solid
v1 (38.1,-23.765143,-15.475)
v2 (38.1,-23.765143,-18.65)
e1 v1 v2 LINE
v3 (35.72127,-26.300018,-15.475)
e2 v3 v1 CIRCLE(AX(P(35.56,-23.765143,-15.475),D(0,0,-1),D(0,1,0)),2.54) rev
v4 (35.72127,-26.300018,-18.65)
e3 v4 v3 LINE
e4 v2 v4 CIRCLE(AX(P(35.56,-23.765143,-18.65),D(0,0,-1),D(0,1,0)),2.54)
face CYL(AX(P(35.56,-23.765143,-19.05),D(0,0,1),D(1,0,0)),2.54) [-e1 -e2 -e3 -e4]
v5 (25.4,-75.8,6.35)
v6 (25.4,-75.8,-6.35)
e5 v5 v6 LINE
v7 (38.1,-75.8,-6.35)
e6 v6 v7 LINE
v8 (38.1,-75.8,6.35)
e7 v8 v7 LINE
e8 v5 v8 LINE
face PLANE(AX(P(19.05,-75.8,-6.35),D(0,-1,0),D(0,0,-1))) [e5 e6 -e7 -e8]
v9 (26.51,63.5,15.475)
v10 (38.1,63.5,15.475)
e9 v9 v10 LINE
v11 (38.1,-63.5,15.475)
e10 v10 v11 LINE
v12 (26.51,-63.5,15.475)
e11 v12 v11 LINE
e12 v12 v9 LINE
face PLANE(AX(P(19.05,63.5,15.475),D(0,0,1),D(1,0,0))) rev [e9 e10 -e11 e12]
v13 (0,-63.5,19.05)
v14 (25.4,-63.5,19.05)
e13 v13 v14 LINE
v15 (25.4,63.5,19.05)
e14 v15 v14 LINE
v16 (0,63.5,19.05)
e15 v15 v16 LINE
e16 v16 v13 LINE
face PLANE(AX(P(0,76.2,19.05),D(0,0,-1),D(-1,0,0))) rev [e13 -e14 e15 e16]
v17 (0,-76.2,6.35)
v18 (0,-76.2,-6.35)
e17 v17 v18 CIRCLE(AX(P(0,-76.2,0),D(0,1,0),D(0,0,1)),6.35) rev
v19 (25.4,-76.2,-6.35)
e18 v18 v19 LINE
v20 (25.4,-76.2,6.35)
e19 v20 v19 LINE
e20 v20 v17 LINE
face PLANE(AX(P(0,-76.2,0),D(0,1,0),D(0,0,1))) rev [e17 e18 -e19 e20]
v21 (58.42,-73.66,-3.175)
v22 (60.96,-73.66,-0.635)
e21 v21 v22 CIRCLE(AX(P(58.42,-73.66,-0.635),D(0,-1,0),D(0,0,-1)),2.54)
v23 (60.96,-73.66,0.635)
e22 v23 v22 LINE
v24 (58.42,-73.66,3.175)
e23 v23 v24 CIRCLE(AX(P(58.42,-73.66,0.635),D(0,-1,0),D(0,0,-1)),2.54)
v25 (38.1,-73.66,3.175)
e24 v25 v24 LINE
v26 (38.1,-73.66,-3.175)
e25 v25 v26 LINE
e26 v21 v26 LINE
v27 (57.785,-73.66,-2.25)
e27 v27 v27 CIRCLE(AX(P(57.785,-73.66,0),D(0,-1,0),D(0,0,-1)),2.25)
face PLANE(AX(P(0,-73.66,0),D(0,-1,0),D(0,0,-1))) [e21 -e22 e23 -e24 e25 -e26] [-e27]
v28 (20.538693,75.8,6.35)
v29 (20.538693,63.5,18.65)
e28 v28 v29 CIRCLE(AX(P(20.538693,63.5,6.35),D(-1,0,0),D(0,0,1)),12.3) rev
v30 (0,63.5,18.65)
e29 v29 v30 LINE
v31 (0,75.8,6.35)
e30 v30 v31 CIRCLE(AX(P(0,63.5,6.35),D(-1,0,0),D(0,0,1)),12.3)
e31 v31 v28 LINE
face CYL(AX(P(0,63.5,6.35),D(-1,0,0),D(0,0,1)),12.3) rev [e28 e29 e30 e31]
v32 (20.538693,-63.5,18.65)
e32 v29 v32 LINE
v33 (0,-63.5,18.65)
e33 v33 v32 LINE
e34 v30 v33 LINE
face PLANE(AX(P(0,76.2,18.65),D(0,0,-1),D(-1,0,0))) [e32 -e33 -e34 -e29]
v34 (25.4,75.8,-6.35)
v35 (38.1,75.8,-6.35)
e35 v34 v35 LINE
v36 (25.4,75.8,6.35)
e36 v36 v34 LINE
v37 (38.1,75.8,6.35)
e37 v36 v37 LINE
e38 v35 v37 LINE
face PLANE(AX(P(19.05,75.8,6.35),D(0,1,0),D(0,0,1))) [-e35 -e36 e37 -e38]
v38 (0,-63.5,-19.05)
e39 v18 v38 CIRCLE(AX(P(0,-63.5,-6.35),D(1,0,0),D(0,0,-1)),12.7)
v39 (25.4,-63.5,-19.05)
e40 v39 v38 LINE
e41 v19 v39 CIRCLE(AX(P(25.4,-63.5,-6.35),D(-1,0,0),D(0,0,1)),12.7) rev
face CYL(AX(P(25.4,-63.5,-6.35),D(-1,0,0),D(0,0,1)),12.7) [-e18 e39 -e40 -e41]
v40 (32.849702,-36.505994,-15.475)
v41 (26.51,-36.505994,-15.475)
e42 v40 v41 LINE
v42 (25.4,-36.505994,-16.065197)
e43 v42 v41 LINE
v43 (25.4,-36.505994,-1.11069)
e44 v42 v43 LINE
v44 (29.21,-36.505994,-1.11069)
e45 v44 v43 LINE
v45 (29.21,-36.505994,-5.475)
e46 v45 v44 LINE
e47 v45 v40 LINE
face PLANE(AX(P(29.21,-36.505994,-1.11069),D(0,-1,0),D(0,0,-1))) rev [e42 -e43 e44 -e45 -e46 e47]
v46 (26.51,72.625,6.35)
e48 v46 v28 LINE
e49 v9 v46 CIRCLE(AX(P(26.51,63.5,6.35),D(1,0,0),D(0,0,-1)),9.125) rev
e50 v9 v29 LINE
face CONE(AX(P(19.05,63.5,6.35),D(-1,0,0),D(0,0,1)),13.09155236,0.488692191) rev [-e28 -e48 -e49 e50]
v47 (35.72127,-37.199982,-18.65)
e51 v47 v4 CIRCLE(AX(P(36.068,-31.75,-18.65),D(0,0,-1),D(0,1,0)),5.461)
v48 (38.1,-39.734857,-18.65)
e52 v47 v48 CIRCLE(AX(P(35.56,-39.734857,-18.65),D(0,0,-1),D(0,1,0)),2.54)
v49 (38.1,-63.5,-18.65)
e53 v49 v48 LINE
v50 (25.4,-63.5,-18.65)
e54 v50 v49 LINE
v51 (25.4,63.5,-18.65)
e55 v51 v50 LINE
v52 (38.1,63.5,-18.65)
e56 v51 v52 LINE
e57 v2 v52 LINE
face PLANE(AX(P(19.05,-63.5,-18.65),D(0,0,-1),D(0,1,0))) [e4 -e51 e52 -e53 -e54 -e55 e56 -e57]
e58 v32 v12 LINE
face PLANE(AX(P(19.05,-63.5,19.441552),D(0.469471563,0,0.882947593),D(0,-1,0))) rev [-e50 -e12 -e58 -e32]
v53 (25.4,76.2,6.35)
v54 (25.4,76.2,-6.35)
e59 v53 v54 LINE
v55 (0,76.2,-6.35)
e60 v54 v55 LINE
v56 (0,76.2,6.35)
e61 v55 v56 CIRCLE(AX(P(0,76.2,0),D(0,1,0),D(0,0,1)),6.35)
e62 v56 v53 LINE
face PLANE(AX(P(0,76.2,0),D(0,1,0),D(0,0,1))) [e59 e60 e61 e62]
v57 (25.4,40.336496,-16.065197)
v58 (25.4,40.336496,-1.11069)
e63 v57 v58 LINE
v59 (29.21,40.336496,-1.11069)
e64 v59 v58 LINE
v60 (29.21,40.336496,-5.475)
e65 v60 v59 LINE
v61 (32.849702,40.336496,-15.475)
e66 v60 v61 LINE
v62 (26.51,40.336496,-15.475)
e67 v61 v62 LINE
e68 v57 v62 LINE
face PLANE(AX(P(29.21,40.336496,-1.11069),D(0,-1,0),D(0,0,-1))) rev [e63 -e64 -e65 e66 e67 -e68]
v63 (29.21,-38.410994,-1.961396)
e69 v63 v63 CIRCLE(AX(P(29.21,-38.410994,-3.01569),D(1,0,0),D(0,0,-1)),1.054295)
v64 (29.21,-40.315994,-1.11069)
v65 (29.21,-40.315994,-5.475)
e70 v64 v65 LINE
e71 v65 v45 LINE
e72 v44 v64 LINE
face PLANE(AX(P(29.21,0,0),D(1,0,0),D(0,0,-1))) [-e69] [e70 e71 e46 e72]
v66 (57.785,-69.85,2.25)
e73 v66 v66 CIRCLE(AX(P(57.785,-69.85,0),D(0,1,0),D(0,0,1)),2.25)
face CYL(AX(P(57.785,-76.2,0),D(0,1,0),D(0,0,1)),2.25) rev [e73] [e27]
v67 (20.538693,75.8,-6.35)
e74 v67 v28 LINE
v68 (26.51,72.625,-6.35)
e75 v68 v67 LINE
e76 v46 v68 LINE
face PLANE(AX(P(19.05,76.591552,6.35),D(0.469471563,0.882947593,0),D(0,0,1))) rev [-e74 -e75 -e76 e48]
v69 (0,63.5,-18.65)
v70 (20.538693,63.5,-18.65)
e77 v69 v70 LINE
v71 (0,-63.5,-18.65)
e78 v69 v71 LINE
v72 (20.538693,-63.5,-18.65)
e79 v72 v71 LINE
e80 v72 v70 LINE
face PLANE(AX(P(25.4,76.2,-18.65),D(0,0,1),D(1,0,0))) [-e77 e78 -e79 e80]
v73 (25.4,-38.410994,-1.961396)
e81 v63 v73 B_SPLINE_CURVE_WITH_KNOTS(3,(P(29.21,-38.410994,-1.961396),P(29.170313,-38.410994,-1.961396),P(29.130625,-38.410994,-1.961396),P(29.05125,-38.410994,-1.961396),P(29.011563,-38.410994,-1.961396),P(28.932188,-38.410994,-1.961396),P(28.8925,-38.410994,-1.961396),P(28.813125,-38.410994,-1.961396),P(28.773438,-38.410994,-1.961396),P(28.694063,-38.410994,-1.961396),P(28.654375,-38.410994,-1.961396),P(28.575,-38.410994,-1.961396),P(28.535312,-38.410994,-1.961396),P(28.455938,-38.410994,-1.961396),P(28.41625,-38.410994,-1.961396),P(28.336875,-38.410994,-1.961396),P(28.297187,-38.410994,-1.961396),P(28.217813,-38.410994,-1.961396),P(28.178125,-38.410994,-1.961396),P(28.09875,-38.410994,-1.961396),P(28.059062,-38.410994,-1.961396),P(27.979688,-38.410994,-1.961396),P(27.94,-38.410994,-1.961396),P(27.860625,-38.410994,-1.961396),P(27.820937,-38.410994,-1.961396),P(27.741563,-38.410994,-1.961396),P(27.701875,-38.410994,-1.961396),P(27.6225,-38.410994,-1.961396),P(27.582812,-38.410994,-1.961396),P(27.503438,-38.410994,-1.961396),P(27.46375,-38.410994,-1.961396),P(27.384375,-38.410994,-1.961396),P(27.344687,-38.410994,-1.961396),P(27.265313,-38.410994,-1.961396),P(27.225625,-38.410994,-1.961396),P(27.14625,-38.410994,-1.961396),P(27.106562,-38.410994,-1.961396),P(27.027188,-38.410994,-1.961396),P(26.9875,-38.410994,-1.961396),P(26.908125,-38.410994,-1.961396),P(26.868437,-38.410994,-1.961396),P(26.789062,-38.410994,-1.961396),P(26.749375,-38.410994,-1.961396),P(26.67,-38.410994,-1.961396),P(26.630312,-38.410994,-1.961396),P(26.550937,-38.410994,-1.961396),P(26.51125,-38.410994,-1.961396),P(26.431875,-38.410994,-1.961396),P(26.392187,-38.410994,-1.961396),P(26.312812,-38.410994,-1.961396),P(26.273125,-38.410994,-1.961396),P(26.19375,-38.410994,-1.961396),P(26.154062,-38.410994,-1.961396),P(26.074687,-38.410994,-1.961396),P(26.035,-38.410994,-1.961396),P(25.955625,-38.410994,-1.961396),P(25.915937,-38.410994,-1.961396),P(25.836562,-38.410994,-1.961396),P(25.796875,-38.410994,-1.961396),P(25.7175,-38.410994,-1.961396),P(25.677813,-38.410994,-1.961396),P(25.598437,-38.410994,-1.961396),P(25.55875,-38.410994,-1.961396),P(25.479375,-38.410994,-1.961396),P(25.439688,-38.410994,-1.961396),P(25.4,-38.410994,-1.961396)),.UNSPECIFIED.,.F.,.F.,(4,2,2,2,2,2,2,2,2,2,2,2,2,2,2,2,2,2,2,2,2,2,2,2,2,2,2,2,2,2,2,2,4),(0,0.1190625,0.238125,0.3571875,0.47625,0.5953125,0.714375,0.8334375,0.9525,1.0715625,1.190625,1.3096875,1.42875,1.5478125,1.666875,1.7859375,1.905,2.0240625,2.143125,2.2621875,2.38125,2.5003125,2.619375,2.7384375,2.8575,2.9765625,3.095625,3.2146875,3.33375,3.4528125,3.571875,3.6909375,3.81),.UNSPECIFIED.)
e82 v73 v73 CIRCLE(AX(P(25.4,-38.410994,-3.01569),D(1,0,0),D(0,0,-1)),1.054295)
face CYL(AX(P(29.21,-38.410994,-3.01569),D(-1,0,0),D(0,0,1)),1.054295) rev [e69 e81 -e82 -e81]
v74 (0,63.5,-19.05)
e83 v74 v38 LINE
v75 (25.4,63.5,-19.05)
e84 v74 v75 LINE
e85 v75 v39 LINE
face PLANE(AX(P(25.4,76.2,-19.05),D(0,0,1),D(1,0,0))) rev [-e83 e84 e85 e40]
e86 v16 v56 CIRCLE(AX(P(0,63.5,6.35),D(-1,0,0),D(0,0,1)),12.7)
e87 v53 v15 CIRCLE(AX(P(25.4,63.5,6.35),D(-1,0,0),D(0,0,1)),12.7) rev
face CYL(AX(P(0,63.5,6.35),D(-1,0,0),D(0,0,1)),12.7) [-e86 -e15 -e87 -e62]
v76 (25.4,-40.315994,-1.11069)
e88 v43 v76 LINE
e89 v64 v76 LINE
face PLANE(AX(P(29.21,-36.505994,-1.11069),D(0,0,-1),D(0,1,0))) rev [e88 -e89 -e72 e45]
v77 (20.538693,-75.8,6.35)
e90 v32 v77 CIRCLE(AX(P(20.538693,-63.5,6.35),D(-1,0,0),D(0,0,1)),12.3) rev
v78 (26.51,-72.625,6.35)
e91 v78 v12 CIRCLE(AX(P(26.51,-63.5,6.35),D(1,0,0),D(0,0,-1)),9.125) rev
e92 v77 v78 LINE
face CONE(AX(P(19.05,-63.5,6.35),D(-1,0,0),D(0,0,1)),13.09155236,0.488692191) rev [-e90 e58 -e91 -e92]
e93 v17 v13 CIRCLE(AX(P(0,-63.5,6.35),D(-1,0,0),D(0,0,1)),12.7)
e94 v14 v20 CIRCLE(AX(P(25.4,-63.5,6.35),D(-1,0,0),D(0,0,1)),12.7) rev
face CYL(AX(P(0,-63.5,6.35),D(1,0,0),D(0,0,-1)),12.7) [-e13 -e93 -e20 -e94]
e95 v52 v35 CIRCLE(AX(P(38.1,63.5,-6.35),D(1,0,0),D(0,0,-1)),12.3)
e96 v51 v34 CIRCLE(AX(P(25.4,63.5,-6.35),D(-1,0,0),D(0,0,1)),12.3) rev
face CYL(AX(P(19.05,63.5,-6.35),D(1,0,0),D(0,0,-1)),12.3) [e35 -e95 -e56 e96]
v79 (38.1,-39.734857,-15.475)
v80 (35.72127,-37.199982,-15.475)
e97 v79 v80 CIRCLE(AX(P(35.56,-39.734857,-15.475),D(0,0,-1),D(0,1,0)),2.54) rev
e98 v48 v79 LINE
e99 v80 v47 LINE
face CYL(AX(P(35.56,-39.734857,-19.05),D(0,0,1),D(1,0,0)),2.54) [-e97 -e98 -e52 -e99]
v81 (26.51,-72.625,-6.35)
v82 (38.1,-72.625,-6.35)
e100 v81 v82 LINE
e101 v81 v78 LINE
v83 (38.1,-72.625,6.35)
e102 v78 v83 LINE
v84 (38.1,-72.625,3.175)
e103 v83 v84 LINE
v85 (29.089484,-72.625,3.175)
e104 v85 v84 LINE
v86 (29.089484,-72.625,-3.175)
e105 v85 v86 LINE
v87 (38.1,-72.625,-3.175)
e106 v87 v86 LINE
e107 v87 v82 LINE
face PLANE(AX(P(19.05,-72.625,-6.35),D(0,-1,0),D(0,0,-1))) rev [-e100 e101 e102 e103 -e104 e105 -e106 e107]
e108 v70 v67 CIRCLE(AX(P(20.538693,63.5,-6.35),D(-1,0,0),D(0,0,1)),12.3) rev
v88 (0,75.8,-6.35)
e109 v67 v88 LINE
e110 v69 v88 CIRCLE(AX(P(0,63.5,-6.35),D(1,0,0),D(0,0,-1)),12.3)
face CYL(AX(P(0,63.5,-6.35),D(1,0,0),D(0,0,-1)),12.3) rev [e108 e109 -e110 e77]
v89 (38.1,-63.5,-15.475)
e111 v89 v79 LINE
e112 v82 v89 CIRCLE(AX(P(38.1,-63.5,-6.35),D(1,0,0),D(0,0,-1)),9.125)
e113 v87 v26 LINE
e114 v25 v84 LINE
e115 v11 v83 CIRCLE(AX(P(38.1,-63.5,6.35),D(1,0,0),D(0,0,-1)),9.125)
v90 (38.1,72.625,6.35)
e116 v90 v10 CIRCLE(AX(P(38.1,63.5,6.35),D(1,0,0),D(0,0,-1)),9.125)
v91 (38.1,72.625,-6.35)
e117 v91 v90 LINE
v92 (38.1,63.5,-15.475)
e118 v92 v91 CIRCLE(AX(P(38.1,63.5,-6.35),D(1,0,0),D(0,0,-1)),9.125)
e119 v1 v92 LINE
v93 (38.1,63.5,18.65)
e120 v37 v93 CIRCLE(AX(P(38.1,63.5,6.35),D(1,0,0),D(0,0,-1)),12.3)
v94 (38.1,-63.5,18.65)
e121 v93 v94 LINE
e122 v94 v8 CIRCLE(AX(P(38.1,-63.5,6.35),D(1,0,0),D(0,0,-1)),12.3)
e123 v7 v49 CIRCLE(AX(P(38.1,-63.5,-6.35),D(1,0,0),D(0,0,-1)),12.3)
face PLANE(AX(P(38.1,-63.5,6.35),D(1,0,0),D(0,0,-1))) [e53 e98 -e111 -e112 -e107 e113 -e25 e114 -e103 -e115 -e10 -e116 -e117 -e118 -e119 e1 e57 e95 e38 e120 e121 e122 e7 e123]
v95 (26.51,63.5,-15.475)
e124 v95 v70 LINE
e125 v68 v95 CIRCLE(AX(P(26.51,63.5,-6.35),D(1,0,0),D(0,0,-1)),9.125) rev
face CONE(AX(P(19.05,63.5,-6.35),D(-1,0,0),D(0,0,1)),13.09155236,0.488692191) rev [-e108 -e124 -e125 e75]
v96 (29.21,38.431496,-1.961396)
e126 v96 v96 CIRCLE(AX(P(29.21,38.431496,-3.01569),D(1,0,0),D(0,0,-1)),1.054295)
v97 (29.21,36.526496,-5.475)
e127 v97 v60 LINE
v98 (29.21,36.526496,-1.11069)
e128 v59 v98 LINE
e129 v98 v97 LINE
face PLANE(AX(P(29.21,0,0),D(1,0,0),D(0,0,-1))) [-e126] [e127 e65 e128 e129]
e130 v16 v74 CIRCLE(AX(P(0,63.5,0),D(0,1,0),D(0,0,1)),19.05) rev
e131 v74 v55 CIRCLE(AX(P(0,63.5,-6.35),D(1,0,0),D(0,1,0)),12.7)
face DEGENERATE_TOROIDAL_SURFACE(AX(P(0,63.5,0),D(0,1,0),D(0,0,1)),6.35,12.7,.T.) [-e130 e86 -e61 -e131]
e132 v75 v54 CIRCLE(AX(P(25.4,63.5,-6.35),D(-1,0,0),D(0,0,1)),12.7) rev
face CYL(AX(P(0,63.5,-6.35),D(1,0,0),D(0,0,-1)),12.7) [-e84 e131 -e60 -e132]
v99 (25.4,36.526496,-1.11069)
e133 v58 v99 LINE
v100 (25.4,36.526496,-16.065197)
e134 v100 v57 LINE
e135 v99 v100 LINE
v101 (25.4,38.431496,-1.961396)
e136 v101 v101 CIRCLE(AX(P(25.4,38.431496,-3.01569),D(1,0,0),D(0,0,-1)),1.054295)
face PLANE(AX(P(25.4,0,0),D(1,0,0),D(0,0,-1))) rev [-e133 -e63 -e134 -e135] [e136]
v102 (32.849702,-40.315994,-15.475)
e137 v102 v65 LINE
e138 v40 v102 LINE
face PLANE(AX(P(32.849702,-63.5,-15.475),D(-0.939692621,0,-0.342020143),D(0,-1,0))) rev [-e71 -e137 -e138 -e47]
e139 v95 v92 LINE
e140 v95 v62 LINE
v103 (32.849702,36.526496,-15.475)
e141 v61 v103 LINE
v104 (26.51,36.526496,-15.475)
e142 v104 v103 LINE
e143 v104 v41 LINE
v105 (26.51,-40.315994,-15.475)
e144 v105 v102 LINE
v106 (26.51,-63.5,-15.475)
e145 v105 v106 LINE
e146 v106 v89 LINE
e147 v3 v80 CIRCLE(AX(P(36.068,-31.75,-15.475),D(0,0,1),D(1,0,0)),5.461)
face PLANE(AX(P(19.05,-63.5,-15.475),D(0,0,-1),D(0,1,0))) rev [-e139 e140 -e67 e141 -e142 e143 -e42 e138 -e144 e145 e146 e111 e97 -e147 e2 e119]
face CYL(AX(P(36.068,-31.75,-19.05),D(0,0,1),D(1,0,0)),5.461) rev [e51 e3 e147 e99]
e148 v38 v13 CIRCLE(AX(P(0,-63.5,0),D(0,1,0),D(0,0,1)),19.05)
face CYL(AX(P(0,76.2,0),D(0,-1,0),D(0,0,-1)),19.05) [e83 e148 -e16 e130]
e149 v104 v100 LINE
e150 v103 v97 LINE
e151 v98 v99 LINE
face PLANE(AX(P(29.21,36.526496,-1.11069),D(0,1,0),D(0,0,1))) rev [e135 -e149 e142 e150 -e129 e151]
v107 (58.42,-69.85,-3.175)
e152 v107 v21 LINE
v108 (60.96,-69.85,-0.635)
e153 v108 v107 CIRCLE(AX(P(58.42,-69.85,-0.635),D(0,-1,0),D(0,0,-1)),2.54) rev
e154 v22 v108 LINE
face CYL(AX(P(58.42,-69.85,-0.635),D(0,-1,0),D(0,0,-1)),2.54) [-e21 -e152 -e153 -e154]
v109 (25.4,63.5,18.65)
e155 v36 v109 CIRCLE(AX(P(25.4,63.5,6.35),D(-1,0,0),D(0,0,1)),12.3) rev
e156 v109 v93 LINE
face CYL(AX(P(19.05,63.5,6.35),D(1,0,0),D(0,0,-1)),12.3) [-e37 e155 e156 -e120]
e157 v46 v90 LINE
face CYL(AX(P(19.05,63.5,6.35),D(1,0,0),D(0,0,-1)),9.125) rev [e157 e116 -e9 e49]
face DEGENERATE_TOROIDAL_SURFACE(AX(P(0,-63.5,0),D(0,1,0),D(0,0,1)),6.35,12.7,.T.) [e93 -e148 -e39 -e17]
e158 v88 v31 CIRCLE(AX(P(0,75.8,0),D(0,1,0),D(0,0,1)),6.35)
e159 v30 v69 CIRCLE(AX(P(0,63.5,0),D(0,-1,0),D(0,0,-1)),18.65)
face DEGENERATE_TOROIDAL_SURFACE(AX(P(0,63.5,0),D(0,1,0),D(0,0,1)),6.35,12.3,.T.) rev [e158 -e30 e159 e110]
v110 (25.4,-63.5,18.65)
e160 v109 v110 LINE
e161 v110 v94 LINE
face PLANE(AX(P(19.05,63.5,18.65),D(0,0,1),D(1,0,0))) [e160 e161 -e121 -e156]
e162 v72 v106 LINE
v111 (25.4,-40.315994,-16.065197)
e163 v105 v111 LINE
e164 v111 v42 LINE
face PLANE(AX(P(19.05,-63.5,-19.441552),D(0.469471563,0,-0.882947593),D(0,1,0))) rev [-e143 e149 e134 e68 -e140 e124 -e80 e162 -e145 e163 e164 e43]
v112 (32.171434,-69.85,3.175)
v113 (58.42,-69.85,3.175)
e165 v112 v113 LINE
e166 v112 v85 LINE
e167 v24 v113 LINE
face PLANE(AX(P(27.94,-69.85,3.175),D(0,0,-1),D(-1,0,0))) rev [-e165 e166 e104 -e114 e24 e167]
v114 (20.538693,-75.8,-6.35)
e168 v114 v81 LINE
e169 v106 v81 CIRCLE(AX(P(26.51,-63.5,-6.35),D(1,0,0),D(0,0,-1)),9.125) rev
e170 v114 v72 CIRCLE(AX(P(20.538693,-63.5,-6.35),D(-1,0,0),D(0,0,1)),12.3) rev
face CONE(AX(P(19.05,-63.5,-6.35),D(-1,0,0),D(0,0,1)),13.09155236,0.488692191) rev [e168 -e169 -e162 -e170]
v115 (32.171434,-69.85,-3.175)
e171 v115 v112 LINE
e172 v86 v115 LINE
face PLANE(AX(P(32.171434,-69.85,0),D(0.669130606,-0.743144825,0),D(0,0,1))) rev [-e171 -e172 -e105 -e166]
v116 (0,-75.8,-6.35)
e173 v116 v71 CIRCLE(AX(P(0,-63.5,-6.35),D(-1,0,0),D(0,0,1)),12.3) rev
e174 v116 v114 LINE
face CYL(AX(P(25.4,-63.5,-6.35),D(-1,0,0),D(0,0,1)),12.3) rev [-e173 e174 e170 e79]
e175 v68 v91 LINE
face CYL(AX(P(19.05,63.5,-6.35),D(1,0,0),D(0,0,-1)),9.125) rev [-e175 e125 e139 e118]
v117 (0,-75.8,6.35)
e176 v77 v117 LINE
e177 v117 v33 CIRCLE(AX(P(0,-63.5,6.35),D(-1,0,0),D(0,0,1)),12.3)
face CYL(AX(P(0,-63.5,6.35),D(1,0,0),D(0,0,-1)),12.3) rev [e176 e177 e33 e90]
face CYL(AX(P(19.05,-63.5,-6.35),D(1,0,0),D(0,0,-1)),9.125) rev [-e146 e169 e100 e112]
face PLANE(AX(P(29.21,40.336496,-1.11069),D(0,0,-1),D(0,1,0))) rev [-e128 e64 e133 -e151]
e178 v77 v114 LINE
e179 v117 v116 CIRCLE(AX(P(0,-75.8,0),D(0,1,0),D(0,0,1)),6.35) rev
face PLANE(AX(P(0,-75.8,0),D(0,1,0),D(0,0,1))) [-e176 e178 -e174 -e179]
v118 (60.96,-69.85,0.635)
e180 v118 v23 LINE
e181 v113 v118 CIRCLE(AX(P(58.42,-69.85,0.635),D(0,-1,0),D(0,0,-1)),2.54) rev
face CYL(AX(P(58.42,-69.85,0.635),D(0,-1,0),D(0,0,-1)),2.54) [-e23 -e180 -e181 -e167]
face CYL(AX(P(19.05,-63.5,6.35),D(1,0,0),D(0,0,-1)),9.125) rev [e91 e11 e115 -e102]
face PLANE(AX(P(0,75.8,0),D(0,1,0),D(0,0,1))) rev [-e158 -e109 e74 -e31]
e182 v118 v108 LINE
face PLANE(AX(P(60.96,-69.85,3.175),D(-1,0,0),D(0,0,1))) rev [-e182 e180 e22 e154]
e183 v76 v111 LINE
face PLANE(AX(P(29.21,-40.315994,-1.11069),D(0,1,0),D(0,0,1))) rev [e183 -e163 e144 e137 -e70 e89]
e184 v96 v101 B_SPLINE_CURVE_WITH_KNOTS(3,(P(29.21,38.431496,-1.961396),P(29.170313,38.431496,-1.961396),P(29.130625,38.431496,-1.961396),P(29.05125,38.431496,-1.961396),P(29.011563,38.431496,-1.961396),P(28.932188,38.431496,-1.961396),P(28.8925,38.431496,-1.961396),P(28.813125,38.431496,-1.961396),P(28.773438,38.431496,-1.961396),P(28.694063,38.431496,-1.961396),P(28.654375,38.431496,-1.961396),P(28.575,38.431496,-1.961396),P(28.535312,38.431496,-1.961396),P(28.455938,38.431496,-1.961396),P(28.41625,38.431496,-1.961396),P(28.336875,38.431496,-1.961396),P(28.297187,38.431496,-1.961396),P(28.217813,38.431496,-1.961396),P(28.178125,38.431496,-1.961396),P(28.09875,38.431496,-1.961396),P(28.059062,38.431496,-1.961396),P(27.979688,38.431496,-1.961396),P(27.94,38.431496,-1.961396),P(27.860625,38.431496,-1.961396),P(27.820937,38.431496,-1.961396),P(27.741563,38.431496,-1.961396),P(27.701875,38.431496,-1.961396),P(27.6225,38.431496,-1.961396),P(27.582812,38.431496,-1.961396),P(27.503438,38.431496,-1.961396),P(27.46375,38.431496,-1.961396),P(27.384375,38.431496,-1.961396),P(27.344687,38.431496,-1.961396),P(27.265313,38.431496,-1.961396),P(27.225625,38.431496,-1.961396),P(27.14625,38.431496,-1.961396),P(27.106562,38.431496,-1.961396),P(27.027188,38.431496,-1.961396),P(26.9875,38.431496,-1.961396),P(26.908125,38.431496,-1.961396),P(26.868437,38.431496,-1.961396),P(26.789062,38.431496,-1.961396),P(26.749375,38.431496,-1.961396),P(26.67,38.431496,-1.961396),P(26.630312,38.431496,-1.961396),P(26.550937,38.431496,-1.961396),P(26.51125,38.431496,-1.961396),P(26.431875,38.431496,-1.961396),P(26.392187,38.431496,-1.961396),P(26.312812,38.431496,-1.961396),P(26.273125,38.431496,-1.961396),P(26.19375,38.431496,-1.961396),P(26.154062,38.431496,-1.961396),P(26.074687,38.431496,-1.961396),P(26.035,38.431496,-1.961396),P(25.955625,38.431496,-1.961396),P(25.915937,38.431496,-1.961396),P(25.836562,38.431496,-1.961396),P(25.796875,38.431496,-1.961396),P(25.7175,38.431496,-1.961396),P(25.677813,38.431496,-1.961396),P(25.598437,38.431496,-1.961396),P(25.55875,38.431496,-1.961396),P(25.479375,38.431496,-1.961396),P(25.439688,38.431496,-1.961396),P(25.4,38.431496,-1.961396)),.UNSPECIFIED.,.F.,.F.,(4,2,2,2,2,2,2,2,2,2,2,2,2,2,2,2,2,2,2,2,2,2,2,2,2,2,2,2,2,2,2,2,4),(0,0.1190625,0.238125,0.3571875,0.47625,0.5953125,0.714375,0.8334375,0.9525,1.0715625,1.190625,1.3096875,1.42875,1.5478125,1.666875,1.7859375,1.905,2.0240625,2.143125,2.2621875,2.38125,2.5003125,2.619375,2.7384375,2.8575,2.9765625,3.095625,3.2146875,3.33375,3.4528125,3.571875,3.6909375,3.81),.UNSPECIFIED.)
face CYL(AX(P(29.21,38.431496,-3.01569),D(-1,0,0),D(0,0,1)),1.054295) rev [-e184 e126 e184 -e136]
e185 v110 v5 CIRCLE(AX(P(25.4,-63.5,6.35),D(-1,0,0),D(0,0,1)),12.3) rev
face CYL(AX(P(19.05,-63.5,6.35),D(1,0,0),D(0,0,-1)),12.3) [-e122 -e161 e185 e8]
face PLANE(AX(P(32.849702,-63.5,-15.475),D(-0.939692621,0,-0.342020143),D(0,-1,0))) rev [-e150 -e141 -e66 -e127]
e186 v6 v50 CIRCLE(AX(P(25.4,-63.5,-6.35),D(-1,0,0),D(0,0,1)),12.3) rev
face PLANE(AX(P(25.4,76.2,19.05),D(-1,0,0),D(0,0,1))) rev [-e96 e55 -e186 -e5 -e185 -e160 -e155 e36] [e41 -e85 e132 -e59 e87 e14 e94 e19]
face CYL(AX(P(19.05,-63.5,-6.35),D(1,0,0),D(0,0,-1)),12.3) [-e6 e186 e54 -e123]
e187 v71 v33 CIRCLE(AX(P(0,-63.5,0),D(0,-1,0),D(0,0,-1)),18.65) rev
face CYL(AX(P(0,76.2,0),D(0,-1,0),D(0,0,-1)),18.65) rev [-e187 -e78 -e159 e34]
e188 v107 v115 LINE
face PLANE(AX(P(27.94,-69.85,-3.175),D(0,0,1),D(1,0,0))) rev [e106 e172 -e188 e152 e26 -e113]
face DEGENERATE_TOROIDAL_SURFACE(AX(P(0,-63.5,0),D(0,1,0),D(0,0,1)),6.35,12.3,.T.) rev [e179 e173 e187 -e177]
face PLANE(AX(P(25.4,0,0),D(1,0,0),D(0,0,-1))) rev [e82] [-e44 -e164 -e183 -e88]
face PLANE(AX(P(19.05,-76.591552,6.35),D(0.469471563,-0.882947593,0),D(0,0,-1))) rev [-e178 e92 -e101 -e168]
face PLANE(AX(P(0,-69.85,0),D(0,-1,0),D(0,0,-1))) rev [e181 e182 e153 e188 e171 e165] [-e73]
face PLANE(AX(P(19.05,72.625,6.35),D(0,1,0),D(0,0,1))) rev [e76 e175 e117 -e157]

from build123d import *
from OCP.BRepFilletAPI import BRepFilletAPI_MakeChamfer

# Parameters (mm, degrees)
BOSS_EXTRUDE1_DEPTH      = 76.2
FILLET1_R                = 12.7
SHELL1_T                 = -0.4
EXTRUDE_THIN1_DEPTH      = 12.7
EXTRUDE_THIN1_DEPTH_BACK = 6.35
CHAMFER1_SIZE            = 7.46
CHAMFER1_SIZE_2          = 3.96655236
SKETCH6_W                = 17.539309582
SKETCH6_H                = 3.81
SKETCH6_R                = 1.054294776
BOSS_EXTRUDE3_DEPTH      = 3.81
CHAMFER2_SIZE            = 10
CHAMFER2_SIZE2           = 3.639702343
SKETCH7_W                = 33.02
SKETCH7_H                = 6.35
BOSS_EXTRUDE4_DEPTH      = 3.81
CHAMFER3_SIZE            = 3.81
CHAMFER3_SIZE_2          = 4.231433681
SKETCH8_R                = 2.25
CUT_EXTRUDE1_DEPTH       = 160.403972974
FILLET2_R                = 2.54
SKETCH9_R                = 5.461
CUT_EXTRUDE2_DEPTH       = 104.511048806
FILLET3_R                = 2.54


with BuildPart() as part:
    # Sketch1 → Boss-Extrude1 (new, symmetric)
    with BuildSketch(Plane(origin=(0, 0, 0), x_dir=(1, 0, 0), z_dir=(0, 1, 0))):
        with BuildLine():
            Line((0, -19.05), (25.4, -19.05))
            Line((25.4, -19.05), (25.4, 19.05))
            Line((25.4, 19.05), (0, 19.05))
            ThreePointArc((0, 19.05), (-19.05, 0), (0, -19.05))
        make_face()
    extrude(amount=BOSS_EXTRUDE1_DEPTH, both=True)

    # Fillet1
    fillet1_edges = [part.edges().sort_by_distance(p)[0] for p in [
        (12.7, 76.2, -19.05),
        (-19.05, 76.2, 0),
        (12.7, -76.2, -19.05),
        (12.7, -76.2, 19.05),
        (-19.05, -76.2, 0),
        (12.7, 76.2, 19.05),
    ]]
    fillet(fillet1_edges, radius=FILLET1_R)

    # Shell1
    shell1_openings = [part.faces().sort_by_distance(p)[0] for p in [
        (25.4, 0, 0),
    ]]
    offset(amount=SHELL1_T, openings=shell1_openings, kind=Kind.INTERSECTION)

    # Sketch4 → Extrude-Thin1 (add, two sides: drawn at the far end of the back side and taken through both)
    with BuildSketch(Plane(origin=(25.4, 0, 0), x_dir=(0, 0, -1), z_dir=(1, 0, 0)).offset(-EXTRUDE_THIN1_DEPTH_BACK)):
        with BuildLine():
            Line((18.65, 63.5), (18.65, -63.5))
            ThreePointArc((18.65, -63.5), (15.047413409, -72.197413409), (6.35, -75.8))
            Line((6.35, -75.8), (-6.35, -75.8))
            ThreePointArc((-6.35, -75.8), (-15.047413409, -72.197413409), (-18.65, -63.5))
            Line((-18.65, -63.5), (-18.65, 63.5))
            ThreePointArc((-18.65, 63.5), (-15.047413409, 72.197413409), (-6.35, 75.8))
            Line((-6.35, 75.8), (6.35, 75.8))
            ThreePointArc((6.35, 75.8), (15.047413409, 72.197413409), (18.65, 63.5))
        make_face()
        with BuildLine():
            Line((15.475, 63.5), (15.475, -63.5))
            ThreePointArc((15.475, -63.5), (12.802349378, -69.952349378), (6.35, -72.625))
            Line((6.35, -72.625), (-6.35, -72.625))
            ThreePointArc((-6.35, -72.625), (-12.802349378, -69.952349378), (-15.475, -63.5))
            Line((-15.475, -63.5), (-15.475, 63.5))
            ThreePointArc((-15.475, 63.5), (-12.802349378, 69.952349378), (-6.35, 72.625))
            Line((-6.35, 72.625), (6.35, 72.625))
            ThreePointArc((6.35, 72.625), (12.802349378, 69.952349378), (15.475, 63.5))
        make_face(mode=Mode.SUBTRACT)
    extrude(amount=EXTRUDE_THIN1_DEPTH + EXTRUDE_THIN1_DEPTH_BACK)

    # Chamfer1
    # the kernel refuses this chamfer: 7.46, 3.96655236 mm, written as the material it takes off along each edge
    with BuildSketch(Plane(origin=(19.05, 63.5, -15.475), x_dir=(0.9998355423896509, 0, 0.01813527431257697), z_dir=(0, -1, 0))) as chamfer1_piece_1_section:
        Polygon((CHAMFER1_SIZE * 0.99983554239, -CHAMFER1_SIZE * 0.0181352743126), (-CHAMFER1_SIZE_2 * 0.0181352743135, -CHAMFER1_SIZE_2 * 0.999835542439), (0, 0), align=None)
    chamfer1_piece_1 = extrude(amount=127, mode=Mode.PRIVATE)
    chamfer1_piece_1 = split(chamfer1_piece_1, bisect_by=Plane(origin=(21.815261342, 60.108381876, -18.65), z_dir=(0, 0, 1)), keep=Keep.TOP, mode=Mode.PRIVATE)
    add(chamfer1_piece_1, mode=Mode.SUBTRACT)
    with BuildSketch(Plane(origin=(19.05, 63.5, -6.35), x_dir=(0, 1, 0), z_dir=(0, 0, 1))) as chamfer1_piece_2_section:
        Polygon((9.125, -CHAMFER1_SIZE), (9.125 + CHAMFER1_SIZE_2, 0), (9.125, 0), align=None)
    chamfer1_piece_2 = revolve(axis=Axis((19.05, 63.5, -6.35), (-1, 0, 0)), revolution_arc=90, mode=Mode.PRIVATE)
    chamfer1_piece_2 = chamfer1_piece_2 & Plane(origin=(21.967036343, 63.5, -6.35), x_dir=(0, 0, -1), z_dir=(-1, 0, 0)) * Cylinder(12.3, 53, mode=Mode.PRIVATE)
    add(chamfer1_piece_2, mode=Mode.SUBTRACT)
    with BuildSketch(Plane(origin=(19.05, -63.5, -6.35), x_dir=(0, 0, -1), z_dir=(0, 1, 0))) as chamfer1_piece_3_section:
        Polygon((9.125, -CHAMFER1_SIZE), (9.125 + CHAMFER1_SIZE_2, 0), (9.125, 0), align=None)
    chamfer1_piece_3 = revolve(axis=Axis((19.05, -63.5, -6.35), (-1, 0, 0)), revolution_arc=90, mode=Mode.PRIVATE)
    chamfer1_piece_3 = chamfer1_piece_3 & Plane(origin=(21.967036343, -63.5, -6.35), x_dir=(0, 0, -1), z_dir=(-1, 0, 0)) * Cylinder(12.3, 53, mode=Mode.PRIVATE)
    add(chamfer1_piece_3, mode=Mode.SUBTRACT)
    with BuildSketch(Plane(origin=(19.05, 72.625, 6.35), x_dir=(0.9998355423896509, -0.01813527431257697, 0), z_dir=(0, 0, -1))) as chamfer1_piece_4_section:
        Polygon((CHAMFER1_SIZE * 0.99983554239, -CHAMFER1_SIZE * 0.0181352743126), (-CHAMFER1_SIZE_2 * 0.0181352743135, -CHAMFER1_SIZE_2 * 0.999835542439), (0, 0), align=None)
    chamfer1_piece_4 = extrude(amount=12.7, mode=Mode.PRIVATE)
    chamfer1_piece_4 = split(chamfer1_piece_4, bisect_by=Plane(origin=(21.637658595, 75.8, 3.947497634), z_dir=(0, -1, 0)), keep=Keep.TOP, mode=Mode.PRIVATE)
    add(chamfer1_piece_4, mode=Mode.SUBTRACT)
    with BuildSketch(Plane(origin=(19.05, -72.625, -6.35), x_dir=(0.9998355423896509, 0.01813527431257697, 0), z_dir=(0, 0, 1))) as chamfer1_piece_5_section:
        Polygon((CHAMFER1_SIZE * 0.99983554239, -CHAMFER1_SIZE * 0.0181352743126), (-CHAMFER1_SIZE_2 * 0.0181352743135, -CHAMFER1_SIZE_2 * 0.999835542439), (0, 0), align=None)
    chamfer1_piece_5 = extrude(amount=12.7, mode=Mode.PRIVATE)
    chamfer1_piece_5 = split(chamfer1_piece_5, bisect_by=Plane(origin=(21.637658595, -75.8, -3.947497634), z_dir=(0, 1, 0)), keep=Keep.TOP, mode=Mode.PRIVATE)
    add(chamfer1_piece_5, mode=Mode.SUBTRACT)
    with BuildSketch(Plane(origin=(19.05, 63.5, 6.35), x_dir=(0, 0, 1), z_dir=(0, -1, 0))) as chamfer1_piece_6_section:
        Polygon((9.125, -CHAMFER1_SIZE), (9.125 + CHAMFER1_SIZE_2, 0), (9.125, 0), align=None)
    chamfer1_piece_6 = revolve(axis=Axis((19.05, 63.5, 6.35), (-1, 0, 0)), revolution_arc=90, mode=Mode.PRIVATE)
    chamfer1_piece_6 = chamfer1_piece_6 & Plane(origin=(21.967036343, 63.5, 6.35), x_dir=(0, 0, 1), z_dir=(1, 0, 0)) * Cylinder(12.3, 53, mode=Mode.PRIVATE)
    add(chamfer1_piece_6, mode=Mode.SUBTRACT)
    with BuildSketch(Plane(origin=(19.05, -63.5, 6.35), x_dir=(0, -1, 0), z_dir=(0, 0, -1))) as chamfer1_piece_7_section:
        Polygon((9.125, -CHAMFER1_SIZE), (9.125 + CHAMFER1_SIZE_2, 0), (9.125, 0), align=None)
    chamfer1_piece_7 = revolve(axis=Axis((19.05, -63.5, 6.35), (-1, 0, 0)), revolution_arc=90, mode=Mode.PRIVATE)
    chamfer1_piece_7 = chamfer1_piece_7 & Plane(origin=(21.967036343, -63.5, 6.35), x_dir=(0, 0, 1), z_dir=(1, 0, 0)) * Cylinder(12.3, 53, mode=Mode.PRIVATE)
    add(chamfer1_piece_7, mode=Mode.SUBTRACT)
    with BuildSketch(Plane(origin=(19.05, -63.5, 15.475), x_dir=(0.9998355423896509, 0, -0.01813527431257697), z_dir=(0, 1, 0))) as chamfer1_piece_8_section:
        Polygon((CHAMFER1_SIZE * 0.99983554239, -CHAMFER1_SIZE * 0.0181352743126), (-CHAMFER1_SIZE_2 * 0.0181352743135, -CHAMFER1_SIZE_2 * 0.999835542439), (0, 0), align=None)
    chamfer1_piece_8 = extrude(amount=127, mode=Mode.PRIVATE)
    chamfer1_piece_8 = split(chamfer1_piece_8, bisect_by=Plane(origin=(21.815261342, -60.108381876, 18.65), z_dir=(0, 0, -1)), keep=Keep.TOP, mode=Mode.PRIVATE)
    add(chamfer1_piece_8, mode=Mode.SUBTRACT)

    # Sketch6 → Boss-Extrude3 (add)
    # profile 1 of 2: a face of its own
    with BuildSketch(Plane(origin=(25.4, 0, 0), x_dir=(0, 0, -1), z_dir=(1, 0, 0))):
        with Locations((9.880345209, 38.431496192)):
            Rectangle(SKETCH6_W, SKETCH6_H)
        with Locations(Location((3.015690418, 38.431496192, 0), (0, 0, 180))):
            Circle(SKETCH6_R, mode=Mode.SUBTRACT)
    # profile 2 of 2: a face of its own
    with BuildSketch(Plane(origin=(25.4, 0, 0), x_dir=(0, 0, -1), z_dir=(1, 0, 0))):
        with Locations((9.880345209, -38.410993514)):
            Rectangle(SKETCH6_W, SKETCH6_H)
        with Locations(Location((3.015690418, -38.410993514, 0), (0, 0, 180))):
            Circle(SKETCH6_R, mode=Mode.SUBTRACT)
    extrude(amount=BOSS_EXTRUDE3_DEPTH)

    # Chamfer2: one chamfer whose edges measure the first distance from different faces: ONE call of the kernel's chamfer builder (chamfer() names one face for all edges)
    chamfer2_edges_1 = [part.edges().sort_by_distance(p)[0] for p in [
        (29.21, -38.410993514, -15.475),
    ]]
    chamfer2_side_1 = [part.faces().sort_by_distance(p)[0] for p in [
        (29.21, -38.410993514, -8.652510406),
    ]]
    chamfer2_edges_2 = [part.edges().sort_by_distance(p)[0] for p in [
        (29.21, 38.431496192, -15.475),
    ]]
    chamfer2_side_2 = [part.faces().sort_by_distance(p)[0] for p in [
        (29.21, 38.431496192, -8.652510406),
    ]]
    chamfer2 = BRepFilletAPI_MakeChamfer(part.part.solid().wrapped)
    for e in chamfer2_edges_1:
        chamfer2.Add(CHAMFER2_SIZE, CHAMFER2_SIZE2, e.wrapped, chamfer2_side_1[0].wrapped)  # the first distance lies on this face
    for e in chamfer2_edges_2:
        chamfer2.Add(CHAMFER2_SIZE, CHAMFER2_SIZE2, e.wrapped, chamfer2_side_2[0].wrapped)  # the first distance lies on this face
    add(Compound.cast(chamfer2.Shape()), mode=Mode.REPLACE)

    # Sketch7 → Boss-Extrude4 (add)
    with BuildSketch(Plane(origin=(0, -73.66, 0), x_dir=(1, 0, 0), z_dir=(0, 1, 0))):
        with Locations((44.45, 0)):
            Rectangle(SKETCH7_W, SKETCH7_H)
    extrude(amount=BOSS_EXTRUDE4_DEPTH)

    # Chamfer3
    # the kernel refuses this chamfer: 4.231433681, 3.81 mm, written as the material it takes off along each edge
    with BuildSketch(Plane(origin=(27.94, -69.85, -3.175), x_dir=(-0.03204434000819545, -0.9994864482690294, 0), z_dir=(0, 0, 1))) as chamfer3_piece_1_section:
        Polygon((CHAMFER3_SIZE * 0.999486448269, CHAMFER3_SIZE * 0.0320443400082), (-CHAMFER3_SIZE_2 * 0.032044340012, CHAMFER3_SIZE_2 * 0.999486448387), (0, 0), align=None)
    chamfer3_piece_1 = extrude(amount=6.35, mode=Mode.PRIVATE)
    chamfer3_piece_1 = split(chamfer3_piece_1, bisect_by=Plane(origin=(28.695678786, -72.625, -2.695594609), z_dir=(0, 1, 0)), keep=Keep.TOP, mode=Mode.PRIVATE)
    add(chamfer3_piece_1, mode=Mode.SUBTRACT)

    # Sketch8 → Cut-Extrude1 (cut, through all)
    with BuildSketch(Plane(origin=(0, -69.85, 0), x_dir=(1, 0, 0), z_dir=(0, 1, 0))):
        with Locations(Location((57.785, 0, 0), (0, 0, 270))):
            Circle(SKETCH8_R)
    extrude(amount=-CUT_EXTRUDE1_DEPTH, mode=Mode.SUBTRACT)

    # Fillet2
    fillet2_edges = [part.edges().sort_by_distance(p)[0] for p in [
        (60.96, -71.755, -3.175),
        (60.96, -71.755, 3.175),
    ]]
    fillet(fillet2_edges, radius=FILLET2_R)

    # Sketch9 → Cut-Extrude2 (cut, through all)
    with BuildSketch(Plane.XY.offset(-15.475)):
        with Locations((36.068, -31.75)):
            Circle(SKETCH9_R)
    extrude(amount=-CUT_EXTRUDE2_DEPTH, mode=Mode.SUBTRACT)

    # Fillet3
    fillet3_edges = [part.edges().sort_by_distance(p)[0] for p in [
        (38.1, -26.681124681, -17.0625),
        (38.1, -36.818875319, -17.0625),
    ]]
    fillet(fillet3_edges, radius=FILLET3_R)


solid = part.part
